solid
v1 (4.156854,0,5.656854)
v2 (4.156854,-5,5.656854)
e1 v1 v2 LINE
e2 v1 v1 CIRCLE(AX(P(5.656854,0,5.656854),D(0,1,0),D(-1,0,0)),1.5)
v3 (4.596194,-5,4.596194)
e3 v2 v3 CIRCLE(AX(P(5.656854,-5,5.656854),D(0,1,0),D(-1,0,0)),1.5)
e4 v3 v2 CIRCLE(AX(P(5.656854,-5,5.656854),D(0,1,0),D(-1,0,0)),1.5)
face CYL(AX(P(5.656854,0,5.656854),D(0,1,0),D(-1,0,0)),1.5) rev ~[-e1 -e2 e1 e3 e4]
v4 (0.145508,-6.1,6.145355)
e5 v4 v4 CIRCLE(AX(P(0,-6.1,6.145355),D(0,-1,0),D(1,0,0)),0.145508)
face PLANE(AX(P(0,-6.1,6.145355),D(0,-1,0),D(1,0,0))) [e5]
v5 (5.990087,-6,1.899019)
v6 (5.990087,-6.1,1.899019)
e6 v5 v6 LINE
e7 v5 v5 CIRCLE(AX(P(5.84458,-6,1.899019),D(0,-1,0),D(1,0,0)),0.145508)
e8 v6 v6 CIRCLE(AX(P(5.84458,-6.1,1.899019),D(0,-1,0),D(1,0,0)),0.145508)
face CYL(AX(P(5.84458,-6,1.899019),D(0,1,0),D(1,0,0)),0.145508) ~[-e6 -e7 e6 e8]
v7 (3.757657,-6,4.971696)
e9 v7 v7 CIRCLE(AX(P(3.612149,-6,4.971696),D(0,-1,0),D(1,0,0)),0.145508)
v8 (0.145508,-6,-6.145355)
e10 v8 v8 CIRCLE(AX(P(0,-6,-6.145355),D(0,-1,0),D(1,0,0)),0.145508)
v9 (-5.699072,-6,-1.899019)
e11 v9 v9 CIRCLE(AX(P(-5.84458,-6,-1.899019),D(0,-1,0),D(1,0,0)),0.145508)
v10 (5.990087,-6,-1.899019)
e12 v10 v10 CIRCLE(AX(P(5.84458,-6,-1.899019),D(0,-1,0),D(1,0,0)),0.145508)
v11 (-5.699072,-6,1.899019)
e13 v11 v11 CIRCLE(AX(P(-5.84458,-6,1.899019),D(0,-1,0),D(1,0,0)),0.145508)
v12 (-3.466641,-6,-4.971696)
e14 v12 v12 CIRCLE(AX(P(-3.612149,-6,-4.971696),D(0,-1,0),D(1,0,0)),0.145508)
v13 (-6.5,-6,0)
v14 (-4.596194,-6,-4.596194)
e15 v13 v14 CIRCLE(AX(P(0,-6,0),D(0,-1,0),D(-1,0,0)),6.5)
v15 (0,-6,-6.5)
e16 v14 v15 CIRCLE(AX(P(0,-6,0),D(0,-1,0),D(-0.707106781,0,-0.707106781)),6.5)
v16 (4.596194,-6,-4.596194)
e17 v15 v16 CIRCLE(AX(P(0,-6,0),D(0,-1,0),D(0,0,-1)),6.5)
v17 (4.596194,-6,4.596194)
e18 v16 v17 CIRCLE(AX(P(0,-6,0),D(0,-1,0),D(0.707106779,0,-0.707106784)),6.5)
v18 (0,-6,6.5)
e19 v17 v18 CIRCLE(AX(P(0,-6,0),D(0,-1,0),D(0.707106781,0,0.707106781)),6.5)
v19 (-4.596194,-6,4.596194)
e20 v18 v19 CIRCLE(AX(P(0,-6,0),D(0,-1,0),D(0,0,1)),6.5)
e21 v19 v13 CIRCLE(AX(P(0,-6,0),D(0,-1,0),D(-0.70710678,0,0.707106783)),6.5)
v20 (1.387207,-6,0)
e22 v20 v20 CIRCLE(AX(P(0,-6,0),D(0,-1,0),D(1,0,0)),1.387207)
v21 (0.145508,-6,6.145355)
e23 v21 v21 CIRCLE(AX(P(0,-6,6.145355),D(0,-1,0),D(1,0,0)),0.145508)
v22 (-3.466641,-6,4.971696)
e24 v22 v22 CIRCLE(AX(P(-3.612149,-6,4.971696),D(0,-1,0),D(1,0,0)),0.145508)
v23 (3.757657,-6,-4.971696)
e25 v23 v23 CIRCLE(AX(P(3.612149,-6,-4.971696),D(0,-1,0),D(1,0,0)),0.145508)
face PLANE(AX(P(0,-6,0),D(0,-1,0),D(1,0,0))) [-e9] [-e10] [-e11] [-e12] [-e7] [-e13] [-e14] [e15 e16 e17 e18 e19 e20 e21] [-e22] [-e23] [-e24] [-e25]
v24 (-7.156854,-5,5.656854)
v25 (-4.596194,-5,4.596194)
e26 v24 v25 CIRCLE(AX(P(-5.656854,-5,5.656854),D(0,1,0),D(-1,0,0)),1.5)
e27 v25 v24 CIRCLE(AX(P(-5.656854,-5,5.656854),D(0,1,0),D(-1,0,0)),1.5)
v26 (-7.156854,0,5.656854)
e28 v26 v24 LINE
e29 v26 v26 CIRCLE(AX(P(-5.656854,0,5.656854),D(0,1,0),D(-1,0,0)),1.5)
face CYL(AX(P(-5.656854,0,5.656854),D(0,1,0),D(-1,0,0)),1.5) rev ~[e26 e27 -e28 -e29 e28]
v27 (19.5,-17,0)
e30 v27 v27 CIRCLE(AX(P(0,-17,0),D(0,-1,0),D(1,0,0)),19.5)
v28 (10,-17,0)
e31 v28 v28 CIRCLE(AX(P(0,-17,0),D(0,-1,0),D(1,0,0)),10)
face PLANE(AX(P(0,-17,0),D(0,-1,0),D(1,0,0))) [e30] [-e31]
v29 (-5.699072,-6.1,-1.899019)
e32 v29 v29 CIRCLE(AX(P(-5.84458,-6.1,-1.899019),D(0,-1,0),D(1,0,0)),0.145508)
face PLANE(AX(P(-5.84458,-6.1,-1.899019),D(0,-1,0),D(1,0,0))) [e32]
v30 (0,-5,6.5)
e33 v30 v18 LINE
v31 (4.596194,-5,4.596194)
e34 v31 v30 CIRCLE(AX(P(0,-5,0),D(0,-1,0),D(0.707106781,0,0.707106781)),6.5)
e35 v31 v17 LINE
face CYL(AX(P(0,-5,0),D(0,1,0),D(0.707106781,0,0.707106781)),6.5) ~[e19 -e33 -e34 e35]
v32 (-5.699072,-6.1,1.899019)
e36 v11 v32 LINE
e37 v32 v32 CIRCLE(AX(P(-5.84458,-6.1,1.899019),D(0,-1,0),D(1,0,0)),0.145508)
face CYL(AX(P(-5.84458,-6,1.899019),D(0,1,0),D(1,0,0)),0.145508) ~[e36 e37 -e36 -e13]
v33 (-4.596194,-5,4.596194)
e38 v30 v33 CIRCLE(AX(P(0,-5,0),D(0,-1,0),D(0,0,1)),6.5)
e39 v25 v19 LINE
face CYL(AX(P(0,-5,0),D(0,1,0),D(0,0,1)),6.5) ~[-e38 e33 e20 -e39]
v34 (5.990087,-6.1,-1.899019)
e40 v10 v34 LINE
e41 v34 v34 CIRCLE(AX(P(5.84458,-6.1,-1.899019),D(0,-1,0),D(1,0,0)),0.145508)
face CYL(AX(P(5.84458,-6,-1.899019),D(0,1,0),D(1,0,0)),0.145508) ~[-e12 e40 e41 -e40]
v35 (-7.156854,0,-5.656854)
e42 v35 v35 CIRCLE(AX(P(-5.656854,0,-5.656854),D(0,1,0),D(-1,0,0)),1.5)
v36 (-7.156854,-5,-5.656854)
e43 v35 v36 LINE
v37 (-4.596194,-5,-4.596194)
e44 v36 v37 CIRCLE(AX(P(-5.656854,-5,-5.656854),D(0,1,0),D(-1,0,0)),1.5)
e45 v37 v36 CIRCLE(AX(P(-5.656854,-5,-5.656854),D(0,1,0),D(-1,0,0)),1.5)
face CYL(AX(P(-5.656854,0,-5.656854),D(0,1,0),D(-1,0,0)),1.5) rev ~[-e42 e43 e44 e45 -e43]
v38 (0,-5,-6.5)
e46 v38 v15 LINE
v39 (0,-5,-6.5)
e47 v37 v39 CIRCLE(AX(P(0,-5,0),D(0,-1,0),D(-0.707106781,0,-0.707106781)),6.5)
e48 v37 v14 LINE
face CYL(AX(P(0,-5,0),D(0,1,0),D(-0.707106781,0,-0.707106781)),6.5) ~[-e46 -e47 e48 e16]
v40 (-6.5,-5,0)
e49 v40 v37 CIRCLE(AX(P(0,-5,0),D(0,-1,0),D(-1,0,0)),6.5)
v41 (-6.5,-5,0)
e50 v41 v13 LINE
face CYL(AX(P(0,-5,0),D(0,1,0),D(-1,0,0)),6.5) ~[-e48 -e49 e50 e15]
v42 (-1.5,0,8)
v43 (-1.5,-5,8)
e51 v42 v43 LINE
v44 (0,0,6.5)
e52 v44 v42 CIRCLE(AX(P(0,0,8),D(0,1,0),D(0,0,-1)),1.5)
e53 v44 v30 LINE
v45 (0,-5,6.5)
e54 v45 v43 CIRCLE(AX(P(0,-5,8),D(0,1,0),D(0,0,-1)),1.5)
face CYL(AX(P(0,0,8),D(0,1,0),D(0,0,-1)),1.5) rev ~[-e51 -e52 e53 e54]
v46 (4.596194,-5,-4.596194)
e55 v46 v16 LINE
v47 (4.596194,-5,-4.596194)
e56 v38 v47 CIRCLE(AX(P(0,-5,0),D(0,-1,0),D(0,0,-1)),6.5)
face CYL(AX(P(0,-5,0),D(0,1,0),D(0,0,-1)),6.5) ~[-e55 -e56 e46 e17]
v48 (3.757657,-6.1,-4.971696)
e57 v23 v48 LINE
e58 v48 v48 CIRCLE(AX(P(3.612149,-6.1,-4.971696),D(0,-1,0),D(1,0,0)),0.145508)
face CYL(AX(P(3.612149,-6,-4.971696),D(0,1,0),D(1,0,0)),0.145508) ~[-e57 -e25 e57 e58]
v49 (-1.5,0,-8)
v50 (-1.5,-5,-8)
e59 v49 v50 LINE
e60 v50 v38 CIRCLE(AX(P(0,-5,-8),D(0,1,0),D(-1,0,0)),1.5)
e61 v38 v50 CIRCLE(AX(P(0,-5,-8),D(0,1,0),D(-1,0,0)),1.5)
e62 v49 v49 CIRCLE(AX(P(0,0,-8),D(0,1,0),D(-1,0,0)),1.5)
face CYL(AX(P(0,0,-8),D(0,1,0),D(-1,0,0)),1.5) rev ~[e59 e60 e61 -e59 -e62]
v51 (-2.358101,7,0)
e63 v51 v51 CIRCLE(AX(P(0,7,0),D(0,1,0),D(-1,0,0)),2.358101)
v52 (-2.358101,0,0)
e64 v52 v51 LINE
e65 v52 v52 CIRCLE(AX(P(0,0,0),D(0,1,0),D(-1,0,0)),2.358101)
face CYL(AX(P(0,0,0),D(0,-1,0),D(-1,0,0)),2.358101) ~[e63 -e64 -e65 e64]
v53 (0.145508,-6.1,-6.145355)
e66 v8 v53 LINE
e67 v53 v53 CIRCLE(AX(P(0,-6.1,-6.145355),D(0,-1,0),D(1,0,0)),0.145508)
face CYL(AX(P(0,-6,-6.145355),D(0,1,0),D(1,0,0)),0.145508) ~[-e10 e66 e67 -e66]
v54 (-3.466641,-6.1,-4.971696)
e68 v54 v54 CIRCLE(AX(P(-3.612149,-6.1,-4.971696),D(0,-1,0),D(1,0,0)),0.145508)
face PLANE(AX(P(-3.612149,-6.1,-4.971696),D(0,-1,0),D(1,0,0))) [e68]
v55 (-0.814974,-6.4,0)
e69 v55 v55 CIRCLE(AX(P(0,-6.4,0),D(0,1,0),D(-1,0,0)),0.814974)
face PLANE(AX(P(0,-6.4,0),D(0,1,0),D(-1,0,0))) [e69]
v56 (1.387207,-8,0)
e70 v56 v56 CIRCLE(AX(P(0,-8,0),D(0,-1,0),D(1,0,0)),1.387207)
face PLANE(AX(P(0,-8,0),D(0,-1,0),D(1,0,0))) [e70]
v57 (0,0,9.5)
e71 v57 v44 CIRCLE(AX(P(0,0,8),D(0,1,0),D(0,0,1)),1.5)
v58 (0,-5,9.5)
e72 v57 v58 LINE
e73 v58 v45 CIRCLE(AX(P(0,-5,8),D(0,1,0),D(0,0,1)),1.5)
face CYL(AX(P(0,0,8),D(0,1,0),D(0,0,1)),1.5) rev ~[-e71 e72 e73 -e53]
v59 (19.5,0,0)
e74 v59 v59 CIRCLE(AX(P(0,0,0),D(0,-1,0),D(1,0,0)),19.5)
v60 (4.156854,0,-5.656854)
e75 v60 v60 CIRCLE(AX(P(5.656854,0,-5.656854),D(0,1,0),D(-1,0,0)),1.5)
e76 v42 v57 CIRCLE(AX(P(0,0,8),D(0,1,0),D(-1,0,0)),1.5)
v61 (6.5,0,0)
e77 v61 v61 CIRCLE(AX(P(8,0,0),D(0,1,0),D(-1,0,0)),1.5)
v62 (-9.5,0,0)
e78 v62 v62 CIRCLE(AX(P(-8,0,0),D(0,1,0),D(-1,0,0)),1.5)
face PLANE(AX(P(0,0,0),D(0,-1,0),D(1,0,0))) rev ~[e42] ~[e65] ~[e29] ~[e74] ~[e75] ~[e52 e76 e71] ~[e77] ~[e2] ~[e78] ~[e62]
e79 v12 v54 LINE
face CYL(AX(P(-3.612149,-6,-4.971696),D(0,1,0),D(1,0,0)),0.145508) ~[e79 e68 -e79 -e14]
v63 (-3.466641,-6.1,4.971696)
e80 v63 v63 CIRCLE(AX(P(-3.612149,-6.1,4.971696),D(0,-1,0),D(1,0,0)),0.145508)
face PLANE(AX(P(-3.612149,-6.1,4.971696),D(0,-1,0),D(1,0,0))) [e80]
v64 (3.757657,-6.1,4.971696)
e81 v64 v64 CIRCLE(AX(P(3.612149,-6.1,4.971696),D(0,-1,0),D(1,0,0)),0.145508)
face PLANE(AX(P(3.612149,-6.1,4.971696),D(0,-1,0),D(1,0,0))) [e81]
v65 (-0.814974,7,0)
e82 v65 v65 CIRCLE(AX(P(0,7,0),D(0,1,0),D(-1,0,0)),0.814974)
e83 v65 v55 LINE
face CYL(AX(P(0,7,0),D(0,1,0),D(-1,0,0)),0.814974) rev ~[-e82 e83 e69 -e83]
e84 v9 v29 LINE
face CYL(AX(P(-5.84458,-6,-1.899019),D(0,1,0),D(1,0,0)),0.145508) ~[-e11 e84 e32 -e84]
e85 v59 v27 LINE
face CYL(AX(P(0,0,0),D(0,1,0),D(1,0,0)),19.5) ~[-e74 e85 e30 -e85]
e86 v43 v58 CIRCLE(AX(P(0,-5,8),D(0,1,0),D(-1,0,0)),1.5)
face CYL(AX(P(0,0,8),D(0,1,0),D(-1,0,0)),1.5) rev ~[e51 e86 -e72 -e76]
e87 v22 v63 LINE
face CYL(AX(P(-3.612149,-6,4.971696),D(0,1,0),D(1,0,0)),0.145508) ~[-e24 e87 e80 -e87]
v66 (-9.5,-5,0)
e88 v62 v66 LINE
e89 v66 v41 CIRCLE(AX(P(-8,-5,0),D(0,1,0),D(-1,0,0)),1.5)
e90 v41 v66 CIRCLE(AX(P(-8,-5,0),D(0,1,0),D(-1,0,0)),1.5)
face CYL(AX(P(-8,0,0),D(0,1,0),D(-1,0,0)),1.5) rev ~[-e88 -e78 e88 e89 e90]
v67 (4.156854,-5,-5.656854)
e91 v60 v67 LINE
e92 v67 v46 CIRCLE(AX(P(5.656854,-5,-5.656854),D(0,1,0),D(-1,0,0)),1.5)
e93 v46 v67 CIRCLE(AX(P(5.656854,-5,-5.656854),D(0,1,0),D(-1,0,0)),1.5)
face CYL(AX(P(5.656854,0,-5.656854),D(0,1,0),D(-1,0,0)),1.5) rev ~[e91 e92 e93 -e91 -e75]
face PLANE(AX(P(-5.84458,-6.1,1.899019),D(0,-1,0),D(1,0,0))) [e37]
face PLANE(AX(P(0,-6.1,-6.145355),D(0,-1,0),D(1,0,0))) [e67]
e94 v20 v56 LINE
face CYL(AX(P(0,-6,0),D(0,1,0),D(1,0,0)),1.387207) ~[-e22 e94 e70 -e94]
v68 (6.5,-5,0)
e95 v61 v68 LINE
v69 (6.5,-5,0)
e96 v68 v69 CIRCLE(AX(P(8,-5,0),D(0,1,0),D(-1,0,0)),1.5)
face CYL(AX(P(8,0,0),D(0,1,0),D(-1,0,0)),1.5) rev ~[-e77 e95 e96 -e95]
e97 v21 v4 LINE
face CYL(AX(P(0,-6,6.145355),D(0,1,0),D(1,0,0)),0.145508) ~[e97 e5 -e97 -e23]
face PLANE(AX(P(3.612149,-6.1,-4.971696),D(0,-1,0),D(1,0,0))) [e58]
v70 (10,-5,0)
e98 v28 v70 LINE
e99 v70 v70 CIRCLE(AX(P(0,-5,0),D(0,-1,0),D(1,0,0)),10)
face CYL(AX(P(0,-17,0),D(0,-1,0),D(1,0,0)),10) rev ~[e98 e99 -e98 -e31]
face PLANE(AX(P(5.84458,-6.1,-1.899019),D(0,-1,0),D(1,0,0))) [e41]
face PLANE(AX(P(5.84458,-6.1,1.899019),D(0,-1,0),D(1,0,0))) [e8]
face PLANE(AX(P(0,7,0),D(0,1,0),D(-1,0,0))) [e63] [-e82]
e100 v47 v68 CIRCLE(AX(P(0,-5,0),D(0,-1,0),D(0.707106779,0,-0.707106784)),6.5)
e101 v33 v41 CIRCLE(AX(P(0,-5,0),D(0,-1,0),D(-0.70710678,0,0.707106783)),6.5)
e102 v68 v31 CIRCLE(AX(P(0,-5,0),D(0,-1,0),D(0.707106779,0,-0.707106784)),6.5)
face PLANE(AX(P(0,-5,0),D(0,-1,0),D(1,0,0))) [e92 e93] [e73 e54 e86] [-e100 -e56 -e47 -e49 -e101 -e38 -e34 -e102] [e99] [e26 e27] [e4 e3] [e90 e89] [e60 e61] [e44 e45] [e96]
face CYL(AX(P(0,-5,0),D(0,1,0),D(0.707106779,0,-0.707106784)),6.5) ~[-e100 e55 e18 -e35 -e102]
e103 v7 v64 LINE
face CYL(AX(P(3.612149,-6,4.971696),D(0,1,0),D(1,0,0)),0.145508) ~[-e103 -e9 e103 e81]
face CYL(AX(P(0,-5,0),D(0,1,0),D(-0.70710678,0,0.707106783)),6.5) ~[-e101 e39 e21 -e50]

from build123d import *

# Parameters (mm, degrees)
F0_R      = 19.5
F1_DEPTH  = 17
F2_R      = 10
F3_DEPTH  = 12
F4_R      = 1.5
F5_DEPTH  = 25
F6_R      = 6.5
F7_DEPTH  = 1
F8_R      = 0.1455076687
F9_DEPTH  = 0.1
F11_R     = 1.3872068032
F12_DEPTH = 2
F13_R     = 2.3581013166
F14_DEPTH = 7
F15_R     = 0.8149743097
F16_DEPTH = 13.4


with BuildPart() as f1:
    # F0 (on Front) → F1 (new body)
    with BuildSketch(Plane.XZ):
        Circle(F0_R)
    extrude(amount=F1_DEPTH)

    # F2 (on face) → F3 (cut)
    with BuildSketch(Plane.XZ.offset(17)):
        Circle(F2_R)
    extrude(amount=-F3_DEPTH, mode=Mode.SUBTRACT)

    # F4 (on face) → F5 (cut)
    with BuildSketch(Plane(origin=(0, 0, 0), x_dir=(-1, 0, 0), z_dir=(0, 1, 0))):
        with BuildLine():
            ThreePointArc((0, 9.5), (-1.5, 8), (0, 6.5))
            ThreePointArc((0, 6.5), (1.0606601718, 6.9393398282), (1.5, 8))
            ThreePointArc((1.5, 8), (1.0606601718, 9.0606601718), (0, 9.5))
        make_face()
        with Locations((-5.6568542495, 5.6568542495)):
            Circle(F4_R)
        with Locations((-8, 0)):
            Circle(F4_R)
        with Locations((-5.6568542495, -5.6568542495)):
            Circle(F4_R)
        with Locations((0, -8)):
            Circle(F4_R)
        with Locations((5.6568542495, -5.6568542495)):
            Circle(F4_R)
        with Locations((8, 0)):
            Circle(F4_R)
        with Locations((5.6568542495, 5.6568542495)):
            Circle(F4_R)
    extrude(amount=-F5_DEPTH, mode=Mode.SUBTRACT)

    # F6 (on face) → F7 (join)
    with BuildSketch(Plane.XZ.offset(5)):
        Circle(F6_R)
        with BuildLine():
            ThreePointArc((4.5961940604, -4.596194095), (6.0052169566, -2.4874423217), (6.5, 0))
            ThreePointArc((6.5, 0), (6.0052169613, 2.4874423104), (4.5961940777, 4.5961940777))
            ThreePointArc((4.5961940777, 4.5961940777), (2.4874423104, 6.0052169613), (0, 6.5))
            ThreePointArc((0, 6.5), (-2.4874423043, 6.0052169639), (-4.5961940684, 4.5961940871))
            ThreePointArc((-4.5961940684, 4.5961940871), (-6.0052169588, 2.4874423165), (-6.5, 0))
            ThreePointArc((-6.5, 0), (-6.0052169618, -2.4874423093), (-4.5961940793, -4.5961940761))
            ThreePointArc((-4.5961940793, -4.5961940761), (-2.4874423124, -6.0052169605), (-2.2e-09, -6.5))
            ThreePointArc((-2.2e-09, -6.5), (2.487442298, -6.0052169664), (4.5961940604, -4.596194095))
        make_face()
    extrude(amount=F7_DEPTH)

    # F8 (on face) → F9 (join)
    with BuildSketch(Plane.XZ.offset(6)):
        with Locations((0, 6.145354826)):
            Circle(F8_R)
        with Locations((-3.6121489368, 4.9716964907)):
            Circle(F8_R)
        with Locations((-5.8445797522, 1.8990190777)):
            Circle(F8_R)
        with Locations((-5.8445797522, -1.8990190777)):
            Circle(F8_R)
        with Locations((-3.6121489368, -4.9716964907)):
            Circle(F8_R)
        with Locations((0, -6.145354826)):
            Circle(F8_R)
        with Locations((3.6121489368, -4.9716964907)):
            Circle(F8_R)
        with Locations((5.8445797522, -1.8990190777)):
            Circle(F8_R)
        with Locations((5.8445797522, 1.8990190777)):
            Circle(F8_R)
        with Locations((3.6121489368, 4.9716964907)):
            Circle(F8_R)
    extrude(amount=F9_DEPTH)

    # F11 (on face) → F12 (join)
    with BuildSketch(Plane.XZ.offset(6)):
        Circle(F11_R)
    extrude(amount=F12_DEPTH)

    # F13 (on face) → F14 (join)
    with BuildSketch(Plane(origin=(0, 0, 0), x_dir=(-1, 0, 0), z_dir=(0, 1, 0))):
        Circle(F13_R)
    extrude(amount=F14_DEPTH)

    # F15 (on face) → F16 (cut)
    with BuildSketch(Plane(origin=(0, 7, 0), x_dir=(-1, 0, 0), z_dir=(0, 1, 0))):
        Circle(F15_R)
    extrude(amount=-F16_DEPTH, mode=Mode.SUBTRACT)


solid = f1.part
